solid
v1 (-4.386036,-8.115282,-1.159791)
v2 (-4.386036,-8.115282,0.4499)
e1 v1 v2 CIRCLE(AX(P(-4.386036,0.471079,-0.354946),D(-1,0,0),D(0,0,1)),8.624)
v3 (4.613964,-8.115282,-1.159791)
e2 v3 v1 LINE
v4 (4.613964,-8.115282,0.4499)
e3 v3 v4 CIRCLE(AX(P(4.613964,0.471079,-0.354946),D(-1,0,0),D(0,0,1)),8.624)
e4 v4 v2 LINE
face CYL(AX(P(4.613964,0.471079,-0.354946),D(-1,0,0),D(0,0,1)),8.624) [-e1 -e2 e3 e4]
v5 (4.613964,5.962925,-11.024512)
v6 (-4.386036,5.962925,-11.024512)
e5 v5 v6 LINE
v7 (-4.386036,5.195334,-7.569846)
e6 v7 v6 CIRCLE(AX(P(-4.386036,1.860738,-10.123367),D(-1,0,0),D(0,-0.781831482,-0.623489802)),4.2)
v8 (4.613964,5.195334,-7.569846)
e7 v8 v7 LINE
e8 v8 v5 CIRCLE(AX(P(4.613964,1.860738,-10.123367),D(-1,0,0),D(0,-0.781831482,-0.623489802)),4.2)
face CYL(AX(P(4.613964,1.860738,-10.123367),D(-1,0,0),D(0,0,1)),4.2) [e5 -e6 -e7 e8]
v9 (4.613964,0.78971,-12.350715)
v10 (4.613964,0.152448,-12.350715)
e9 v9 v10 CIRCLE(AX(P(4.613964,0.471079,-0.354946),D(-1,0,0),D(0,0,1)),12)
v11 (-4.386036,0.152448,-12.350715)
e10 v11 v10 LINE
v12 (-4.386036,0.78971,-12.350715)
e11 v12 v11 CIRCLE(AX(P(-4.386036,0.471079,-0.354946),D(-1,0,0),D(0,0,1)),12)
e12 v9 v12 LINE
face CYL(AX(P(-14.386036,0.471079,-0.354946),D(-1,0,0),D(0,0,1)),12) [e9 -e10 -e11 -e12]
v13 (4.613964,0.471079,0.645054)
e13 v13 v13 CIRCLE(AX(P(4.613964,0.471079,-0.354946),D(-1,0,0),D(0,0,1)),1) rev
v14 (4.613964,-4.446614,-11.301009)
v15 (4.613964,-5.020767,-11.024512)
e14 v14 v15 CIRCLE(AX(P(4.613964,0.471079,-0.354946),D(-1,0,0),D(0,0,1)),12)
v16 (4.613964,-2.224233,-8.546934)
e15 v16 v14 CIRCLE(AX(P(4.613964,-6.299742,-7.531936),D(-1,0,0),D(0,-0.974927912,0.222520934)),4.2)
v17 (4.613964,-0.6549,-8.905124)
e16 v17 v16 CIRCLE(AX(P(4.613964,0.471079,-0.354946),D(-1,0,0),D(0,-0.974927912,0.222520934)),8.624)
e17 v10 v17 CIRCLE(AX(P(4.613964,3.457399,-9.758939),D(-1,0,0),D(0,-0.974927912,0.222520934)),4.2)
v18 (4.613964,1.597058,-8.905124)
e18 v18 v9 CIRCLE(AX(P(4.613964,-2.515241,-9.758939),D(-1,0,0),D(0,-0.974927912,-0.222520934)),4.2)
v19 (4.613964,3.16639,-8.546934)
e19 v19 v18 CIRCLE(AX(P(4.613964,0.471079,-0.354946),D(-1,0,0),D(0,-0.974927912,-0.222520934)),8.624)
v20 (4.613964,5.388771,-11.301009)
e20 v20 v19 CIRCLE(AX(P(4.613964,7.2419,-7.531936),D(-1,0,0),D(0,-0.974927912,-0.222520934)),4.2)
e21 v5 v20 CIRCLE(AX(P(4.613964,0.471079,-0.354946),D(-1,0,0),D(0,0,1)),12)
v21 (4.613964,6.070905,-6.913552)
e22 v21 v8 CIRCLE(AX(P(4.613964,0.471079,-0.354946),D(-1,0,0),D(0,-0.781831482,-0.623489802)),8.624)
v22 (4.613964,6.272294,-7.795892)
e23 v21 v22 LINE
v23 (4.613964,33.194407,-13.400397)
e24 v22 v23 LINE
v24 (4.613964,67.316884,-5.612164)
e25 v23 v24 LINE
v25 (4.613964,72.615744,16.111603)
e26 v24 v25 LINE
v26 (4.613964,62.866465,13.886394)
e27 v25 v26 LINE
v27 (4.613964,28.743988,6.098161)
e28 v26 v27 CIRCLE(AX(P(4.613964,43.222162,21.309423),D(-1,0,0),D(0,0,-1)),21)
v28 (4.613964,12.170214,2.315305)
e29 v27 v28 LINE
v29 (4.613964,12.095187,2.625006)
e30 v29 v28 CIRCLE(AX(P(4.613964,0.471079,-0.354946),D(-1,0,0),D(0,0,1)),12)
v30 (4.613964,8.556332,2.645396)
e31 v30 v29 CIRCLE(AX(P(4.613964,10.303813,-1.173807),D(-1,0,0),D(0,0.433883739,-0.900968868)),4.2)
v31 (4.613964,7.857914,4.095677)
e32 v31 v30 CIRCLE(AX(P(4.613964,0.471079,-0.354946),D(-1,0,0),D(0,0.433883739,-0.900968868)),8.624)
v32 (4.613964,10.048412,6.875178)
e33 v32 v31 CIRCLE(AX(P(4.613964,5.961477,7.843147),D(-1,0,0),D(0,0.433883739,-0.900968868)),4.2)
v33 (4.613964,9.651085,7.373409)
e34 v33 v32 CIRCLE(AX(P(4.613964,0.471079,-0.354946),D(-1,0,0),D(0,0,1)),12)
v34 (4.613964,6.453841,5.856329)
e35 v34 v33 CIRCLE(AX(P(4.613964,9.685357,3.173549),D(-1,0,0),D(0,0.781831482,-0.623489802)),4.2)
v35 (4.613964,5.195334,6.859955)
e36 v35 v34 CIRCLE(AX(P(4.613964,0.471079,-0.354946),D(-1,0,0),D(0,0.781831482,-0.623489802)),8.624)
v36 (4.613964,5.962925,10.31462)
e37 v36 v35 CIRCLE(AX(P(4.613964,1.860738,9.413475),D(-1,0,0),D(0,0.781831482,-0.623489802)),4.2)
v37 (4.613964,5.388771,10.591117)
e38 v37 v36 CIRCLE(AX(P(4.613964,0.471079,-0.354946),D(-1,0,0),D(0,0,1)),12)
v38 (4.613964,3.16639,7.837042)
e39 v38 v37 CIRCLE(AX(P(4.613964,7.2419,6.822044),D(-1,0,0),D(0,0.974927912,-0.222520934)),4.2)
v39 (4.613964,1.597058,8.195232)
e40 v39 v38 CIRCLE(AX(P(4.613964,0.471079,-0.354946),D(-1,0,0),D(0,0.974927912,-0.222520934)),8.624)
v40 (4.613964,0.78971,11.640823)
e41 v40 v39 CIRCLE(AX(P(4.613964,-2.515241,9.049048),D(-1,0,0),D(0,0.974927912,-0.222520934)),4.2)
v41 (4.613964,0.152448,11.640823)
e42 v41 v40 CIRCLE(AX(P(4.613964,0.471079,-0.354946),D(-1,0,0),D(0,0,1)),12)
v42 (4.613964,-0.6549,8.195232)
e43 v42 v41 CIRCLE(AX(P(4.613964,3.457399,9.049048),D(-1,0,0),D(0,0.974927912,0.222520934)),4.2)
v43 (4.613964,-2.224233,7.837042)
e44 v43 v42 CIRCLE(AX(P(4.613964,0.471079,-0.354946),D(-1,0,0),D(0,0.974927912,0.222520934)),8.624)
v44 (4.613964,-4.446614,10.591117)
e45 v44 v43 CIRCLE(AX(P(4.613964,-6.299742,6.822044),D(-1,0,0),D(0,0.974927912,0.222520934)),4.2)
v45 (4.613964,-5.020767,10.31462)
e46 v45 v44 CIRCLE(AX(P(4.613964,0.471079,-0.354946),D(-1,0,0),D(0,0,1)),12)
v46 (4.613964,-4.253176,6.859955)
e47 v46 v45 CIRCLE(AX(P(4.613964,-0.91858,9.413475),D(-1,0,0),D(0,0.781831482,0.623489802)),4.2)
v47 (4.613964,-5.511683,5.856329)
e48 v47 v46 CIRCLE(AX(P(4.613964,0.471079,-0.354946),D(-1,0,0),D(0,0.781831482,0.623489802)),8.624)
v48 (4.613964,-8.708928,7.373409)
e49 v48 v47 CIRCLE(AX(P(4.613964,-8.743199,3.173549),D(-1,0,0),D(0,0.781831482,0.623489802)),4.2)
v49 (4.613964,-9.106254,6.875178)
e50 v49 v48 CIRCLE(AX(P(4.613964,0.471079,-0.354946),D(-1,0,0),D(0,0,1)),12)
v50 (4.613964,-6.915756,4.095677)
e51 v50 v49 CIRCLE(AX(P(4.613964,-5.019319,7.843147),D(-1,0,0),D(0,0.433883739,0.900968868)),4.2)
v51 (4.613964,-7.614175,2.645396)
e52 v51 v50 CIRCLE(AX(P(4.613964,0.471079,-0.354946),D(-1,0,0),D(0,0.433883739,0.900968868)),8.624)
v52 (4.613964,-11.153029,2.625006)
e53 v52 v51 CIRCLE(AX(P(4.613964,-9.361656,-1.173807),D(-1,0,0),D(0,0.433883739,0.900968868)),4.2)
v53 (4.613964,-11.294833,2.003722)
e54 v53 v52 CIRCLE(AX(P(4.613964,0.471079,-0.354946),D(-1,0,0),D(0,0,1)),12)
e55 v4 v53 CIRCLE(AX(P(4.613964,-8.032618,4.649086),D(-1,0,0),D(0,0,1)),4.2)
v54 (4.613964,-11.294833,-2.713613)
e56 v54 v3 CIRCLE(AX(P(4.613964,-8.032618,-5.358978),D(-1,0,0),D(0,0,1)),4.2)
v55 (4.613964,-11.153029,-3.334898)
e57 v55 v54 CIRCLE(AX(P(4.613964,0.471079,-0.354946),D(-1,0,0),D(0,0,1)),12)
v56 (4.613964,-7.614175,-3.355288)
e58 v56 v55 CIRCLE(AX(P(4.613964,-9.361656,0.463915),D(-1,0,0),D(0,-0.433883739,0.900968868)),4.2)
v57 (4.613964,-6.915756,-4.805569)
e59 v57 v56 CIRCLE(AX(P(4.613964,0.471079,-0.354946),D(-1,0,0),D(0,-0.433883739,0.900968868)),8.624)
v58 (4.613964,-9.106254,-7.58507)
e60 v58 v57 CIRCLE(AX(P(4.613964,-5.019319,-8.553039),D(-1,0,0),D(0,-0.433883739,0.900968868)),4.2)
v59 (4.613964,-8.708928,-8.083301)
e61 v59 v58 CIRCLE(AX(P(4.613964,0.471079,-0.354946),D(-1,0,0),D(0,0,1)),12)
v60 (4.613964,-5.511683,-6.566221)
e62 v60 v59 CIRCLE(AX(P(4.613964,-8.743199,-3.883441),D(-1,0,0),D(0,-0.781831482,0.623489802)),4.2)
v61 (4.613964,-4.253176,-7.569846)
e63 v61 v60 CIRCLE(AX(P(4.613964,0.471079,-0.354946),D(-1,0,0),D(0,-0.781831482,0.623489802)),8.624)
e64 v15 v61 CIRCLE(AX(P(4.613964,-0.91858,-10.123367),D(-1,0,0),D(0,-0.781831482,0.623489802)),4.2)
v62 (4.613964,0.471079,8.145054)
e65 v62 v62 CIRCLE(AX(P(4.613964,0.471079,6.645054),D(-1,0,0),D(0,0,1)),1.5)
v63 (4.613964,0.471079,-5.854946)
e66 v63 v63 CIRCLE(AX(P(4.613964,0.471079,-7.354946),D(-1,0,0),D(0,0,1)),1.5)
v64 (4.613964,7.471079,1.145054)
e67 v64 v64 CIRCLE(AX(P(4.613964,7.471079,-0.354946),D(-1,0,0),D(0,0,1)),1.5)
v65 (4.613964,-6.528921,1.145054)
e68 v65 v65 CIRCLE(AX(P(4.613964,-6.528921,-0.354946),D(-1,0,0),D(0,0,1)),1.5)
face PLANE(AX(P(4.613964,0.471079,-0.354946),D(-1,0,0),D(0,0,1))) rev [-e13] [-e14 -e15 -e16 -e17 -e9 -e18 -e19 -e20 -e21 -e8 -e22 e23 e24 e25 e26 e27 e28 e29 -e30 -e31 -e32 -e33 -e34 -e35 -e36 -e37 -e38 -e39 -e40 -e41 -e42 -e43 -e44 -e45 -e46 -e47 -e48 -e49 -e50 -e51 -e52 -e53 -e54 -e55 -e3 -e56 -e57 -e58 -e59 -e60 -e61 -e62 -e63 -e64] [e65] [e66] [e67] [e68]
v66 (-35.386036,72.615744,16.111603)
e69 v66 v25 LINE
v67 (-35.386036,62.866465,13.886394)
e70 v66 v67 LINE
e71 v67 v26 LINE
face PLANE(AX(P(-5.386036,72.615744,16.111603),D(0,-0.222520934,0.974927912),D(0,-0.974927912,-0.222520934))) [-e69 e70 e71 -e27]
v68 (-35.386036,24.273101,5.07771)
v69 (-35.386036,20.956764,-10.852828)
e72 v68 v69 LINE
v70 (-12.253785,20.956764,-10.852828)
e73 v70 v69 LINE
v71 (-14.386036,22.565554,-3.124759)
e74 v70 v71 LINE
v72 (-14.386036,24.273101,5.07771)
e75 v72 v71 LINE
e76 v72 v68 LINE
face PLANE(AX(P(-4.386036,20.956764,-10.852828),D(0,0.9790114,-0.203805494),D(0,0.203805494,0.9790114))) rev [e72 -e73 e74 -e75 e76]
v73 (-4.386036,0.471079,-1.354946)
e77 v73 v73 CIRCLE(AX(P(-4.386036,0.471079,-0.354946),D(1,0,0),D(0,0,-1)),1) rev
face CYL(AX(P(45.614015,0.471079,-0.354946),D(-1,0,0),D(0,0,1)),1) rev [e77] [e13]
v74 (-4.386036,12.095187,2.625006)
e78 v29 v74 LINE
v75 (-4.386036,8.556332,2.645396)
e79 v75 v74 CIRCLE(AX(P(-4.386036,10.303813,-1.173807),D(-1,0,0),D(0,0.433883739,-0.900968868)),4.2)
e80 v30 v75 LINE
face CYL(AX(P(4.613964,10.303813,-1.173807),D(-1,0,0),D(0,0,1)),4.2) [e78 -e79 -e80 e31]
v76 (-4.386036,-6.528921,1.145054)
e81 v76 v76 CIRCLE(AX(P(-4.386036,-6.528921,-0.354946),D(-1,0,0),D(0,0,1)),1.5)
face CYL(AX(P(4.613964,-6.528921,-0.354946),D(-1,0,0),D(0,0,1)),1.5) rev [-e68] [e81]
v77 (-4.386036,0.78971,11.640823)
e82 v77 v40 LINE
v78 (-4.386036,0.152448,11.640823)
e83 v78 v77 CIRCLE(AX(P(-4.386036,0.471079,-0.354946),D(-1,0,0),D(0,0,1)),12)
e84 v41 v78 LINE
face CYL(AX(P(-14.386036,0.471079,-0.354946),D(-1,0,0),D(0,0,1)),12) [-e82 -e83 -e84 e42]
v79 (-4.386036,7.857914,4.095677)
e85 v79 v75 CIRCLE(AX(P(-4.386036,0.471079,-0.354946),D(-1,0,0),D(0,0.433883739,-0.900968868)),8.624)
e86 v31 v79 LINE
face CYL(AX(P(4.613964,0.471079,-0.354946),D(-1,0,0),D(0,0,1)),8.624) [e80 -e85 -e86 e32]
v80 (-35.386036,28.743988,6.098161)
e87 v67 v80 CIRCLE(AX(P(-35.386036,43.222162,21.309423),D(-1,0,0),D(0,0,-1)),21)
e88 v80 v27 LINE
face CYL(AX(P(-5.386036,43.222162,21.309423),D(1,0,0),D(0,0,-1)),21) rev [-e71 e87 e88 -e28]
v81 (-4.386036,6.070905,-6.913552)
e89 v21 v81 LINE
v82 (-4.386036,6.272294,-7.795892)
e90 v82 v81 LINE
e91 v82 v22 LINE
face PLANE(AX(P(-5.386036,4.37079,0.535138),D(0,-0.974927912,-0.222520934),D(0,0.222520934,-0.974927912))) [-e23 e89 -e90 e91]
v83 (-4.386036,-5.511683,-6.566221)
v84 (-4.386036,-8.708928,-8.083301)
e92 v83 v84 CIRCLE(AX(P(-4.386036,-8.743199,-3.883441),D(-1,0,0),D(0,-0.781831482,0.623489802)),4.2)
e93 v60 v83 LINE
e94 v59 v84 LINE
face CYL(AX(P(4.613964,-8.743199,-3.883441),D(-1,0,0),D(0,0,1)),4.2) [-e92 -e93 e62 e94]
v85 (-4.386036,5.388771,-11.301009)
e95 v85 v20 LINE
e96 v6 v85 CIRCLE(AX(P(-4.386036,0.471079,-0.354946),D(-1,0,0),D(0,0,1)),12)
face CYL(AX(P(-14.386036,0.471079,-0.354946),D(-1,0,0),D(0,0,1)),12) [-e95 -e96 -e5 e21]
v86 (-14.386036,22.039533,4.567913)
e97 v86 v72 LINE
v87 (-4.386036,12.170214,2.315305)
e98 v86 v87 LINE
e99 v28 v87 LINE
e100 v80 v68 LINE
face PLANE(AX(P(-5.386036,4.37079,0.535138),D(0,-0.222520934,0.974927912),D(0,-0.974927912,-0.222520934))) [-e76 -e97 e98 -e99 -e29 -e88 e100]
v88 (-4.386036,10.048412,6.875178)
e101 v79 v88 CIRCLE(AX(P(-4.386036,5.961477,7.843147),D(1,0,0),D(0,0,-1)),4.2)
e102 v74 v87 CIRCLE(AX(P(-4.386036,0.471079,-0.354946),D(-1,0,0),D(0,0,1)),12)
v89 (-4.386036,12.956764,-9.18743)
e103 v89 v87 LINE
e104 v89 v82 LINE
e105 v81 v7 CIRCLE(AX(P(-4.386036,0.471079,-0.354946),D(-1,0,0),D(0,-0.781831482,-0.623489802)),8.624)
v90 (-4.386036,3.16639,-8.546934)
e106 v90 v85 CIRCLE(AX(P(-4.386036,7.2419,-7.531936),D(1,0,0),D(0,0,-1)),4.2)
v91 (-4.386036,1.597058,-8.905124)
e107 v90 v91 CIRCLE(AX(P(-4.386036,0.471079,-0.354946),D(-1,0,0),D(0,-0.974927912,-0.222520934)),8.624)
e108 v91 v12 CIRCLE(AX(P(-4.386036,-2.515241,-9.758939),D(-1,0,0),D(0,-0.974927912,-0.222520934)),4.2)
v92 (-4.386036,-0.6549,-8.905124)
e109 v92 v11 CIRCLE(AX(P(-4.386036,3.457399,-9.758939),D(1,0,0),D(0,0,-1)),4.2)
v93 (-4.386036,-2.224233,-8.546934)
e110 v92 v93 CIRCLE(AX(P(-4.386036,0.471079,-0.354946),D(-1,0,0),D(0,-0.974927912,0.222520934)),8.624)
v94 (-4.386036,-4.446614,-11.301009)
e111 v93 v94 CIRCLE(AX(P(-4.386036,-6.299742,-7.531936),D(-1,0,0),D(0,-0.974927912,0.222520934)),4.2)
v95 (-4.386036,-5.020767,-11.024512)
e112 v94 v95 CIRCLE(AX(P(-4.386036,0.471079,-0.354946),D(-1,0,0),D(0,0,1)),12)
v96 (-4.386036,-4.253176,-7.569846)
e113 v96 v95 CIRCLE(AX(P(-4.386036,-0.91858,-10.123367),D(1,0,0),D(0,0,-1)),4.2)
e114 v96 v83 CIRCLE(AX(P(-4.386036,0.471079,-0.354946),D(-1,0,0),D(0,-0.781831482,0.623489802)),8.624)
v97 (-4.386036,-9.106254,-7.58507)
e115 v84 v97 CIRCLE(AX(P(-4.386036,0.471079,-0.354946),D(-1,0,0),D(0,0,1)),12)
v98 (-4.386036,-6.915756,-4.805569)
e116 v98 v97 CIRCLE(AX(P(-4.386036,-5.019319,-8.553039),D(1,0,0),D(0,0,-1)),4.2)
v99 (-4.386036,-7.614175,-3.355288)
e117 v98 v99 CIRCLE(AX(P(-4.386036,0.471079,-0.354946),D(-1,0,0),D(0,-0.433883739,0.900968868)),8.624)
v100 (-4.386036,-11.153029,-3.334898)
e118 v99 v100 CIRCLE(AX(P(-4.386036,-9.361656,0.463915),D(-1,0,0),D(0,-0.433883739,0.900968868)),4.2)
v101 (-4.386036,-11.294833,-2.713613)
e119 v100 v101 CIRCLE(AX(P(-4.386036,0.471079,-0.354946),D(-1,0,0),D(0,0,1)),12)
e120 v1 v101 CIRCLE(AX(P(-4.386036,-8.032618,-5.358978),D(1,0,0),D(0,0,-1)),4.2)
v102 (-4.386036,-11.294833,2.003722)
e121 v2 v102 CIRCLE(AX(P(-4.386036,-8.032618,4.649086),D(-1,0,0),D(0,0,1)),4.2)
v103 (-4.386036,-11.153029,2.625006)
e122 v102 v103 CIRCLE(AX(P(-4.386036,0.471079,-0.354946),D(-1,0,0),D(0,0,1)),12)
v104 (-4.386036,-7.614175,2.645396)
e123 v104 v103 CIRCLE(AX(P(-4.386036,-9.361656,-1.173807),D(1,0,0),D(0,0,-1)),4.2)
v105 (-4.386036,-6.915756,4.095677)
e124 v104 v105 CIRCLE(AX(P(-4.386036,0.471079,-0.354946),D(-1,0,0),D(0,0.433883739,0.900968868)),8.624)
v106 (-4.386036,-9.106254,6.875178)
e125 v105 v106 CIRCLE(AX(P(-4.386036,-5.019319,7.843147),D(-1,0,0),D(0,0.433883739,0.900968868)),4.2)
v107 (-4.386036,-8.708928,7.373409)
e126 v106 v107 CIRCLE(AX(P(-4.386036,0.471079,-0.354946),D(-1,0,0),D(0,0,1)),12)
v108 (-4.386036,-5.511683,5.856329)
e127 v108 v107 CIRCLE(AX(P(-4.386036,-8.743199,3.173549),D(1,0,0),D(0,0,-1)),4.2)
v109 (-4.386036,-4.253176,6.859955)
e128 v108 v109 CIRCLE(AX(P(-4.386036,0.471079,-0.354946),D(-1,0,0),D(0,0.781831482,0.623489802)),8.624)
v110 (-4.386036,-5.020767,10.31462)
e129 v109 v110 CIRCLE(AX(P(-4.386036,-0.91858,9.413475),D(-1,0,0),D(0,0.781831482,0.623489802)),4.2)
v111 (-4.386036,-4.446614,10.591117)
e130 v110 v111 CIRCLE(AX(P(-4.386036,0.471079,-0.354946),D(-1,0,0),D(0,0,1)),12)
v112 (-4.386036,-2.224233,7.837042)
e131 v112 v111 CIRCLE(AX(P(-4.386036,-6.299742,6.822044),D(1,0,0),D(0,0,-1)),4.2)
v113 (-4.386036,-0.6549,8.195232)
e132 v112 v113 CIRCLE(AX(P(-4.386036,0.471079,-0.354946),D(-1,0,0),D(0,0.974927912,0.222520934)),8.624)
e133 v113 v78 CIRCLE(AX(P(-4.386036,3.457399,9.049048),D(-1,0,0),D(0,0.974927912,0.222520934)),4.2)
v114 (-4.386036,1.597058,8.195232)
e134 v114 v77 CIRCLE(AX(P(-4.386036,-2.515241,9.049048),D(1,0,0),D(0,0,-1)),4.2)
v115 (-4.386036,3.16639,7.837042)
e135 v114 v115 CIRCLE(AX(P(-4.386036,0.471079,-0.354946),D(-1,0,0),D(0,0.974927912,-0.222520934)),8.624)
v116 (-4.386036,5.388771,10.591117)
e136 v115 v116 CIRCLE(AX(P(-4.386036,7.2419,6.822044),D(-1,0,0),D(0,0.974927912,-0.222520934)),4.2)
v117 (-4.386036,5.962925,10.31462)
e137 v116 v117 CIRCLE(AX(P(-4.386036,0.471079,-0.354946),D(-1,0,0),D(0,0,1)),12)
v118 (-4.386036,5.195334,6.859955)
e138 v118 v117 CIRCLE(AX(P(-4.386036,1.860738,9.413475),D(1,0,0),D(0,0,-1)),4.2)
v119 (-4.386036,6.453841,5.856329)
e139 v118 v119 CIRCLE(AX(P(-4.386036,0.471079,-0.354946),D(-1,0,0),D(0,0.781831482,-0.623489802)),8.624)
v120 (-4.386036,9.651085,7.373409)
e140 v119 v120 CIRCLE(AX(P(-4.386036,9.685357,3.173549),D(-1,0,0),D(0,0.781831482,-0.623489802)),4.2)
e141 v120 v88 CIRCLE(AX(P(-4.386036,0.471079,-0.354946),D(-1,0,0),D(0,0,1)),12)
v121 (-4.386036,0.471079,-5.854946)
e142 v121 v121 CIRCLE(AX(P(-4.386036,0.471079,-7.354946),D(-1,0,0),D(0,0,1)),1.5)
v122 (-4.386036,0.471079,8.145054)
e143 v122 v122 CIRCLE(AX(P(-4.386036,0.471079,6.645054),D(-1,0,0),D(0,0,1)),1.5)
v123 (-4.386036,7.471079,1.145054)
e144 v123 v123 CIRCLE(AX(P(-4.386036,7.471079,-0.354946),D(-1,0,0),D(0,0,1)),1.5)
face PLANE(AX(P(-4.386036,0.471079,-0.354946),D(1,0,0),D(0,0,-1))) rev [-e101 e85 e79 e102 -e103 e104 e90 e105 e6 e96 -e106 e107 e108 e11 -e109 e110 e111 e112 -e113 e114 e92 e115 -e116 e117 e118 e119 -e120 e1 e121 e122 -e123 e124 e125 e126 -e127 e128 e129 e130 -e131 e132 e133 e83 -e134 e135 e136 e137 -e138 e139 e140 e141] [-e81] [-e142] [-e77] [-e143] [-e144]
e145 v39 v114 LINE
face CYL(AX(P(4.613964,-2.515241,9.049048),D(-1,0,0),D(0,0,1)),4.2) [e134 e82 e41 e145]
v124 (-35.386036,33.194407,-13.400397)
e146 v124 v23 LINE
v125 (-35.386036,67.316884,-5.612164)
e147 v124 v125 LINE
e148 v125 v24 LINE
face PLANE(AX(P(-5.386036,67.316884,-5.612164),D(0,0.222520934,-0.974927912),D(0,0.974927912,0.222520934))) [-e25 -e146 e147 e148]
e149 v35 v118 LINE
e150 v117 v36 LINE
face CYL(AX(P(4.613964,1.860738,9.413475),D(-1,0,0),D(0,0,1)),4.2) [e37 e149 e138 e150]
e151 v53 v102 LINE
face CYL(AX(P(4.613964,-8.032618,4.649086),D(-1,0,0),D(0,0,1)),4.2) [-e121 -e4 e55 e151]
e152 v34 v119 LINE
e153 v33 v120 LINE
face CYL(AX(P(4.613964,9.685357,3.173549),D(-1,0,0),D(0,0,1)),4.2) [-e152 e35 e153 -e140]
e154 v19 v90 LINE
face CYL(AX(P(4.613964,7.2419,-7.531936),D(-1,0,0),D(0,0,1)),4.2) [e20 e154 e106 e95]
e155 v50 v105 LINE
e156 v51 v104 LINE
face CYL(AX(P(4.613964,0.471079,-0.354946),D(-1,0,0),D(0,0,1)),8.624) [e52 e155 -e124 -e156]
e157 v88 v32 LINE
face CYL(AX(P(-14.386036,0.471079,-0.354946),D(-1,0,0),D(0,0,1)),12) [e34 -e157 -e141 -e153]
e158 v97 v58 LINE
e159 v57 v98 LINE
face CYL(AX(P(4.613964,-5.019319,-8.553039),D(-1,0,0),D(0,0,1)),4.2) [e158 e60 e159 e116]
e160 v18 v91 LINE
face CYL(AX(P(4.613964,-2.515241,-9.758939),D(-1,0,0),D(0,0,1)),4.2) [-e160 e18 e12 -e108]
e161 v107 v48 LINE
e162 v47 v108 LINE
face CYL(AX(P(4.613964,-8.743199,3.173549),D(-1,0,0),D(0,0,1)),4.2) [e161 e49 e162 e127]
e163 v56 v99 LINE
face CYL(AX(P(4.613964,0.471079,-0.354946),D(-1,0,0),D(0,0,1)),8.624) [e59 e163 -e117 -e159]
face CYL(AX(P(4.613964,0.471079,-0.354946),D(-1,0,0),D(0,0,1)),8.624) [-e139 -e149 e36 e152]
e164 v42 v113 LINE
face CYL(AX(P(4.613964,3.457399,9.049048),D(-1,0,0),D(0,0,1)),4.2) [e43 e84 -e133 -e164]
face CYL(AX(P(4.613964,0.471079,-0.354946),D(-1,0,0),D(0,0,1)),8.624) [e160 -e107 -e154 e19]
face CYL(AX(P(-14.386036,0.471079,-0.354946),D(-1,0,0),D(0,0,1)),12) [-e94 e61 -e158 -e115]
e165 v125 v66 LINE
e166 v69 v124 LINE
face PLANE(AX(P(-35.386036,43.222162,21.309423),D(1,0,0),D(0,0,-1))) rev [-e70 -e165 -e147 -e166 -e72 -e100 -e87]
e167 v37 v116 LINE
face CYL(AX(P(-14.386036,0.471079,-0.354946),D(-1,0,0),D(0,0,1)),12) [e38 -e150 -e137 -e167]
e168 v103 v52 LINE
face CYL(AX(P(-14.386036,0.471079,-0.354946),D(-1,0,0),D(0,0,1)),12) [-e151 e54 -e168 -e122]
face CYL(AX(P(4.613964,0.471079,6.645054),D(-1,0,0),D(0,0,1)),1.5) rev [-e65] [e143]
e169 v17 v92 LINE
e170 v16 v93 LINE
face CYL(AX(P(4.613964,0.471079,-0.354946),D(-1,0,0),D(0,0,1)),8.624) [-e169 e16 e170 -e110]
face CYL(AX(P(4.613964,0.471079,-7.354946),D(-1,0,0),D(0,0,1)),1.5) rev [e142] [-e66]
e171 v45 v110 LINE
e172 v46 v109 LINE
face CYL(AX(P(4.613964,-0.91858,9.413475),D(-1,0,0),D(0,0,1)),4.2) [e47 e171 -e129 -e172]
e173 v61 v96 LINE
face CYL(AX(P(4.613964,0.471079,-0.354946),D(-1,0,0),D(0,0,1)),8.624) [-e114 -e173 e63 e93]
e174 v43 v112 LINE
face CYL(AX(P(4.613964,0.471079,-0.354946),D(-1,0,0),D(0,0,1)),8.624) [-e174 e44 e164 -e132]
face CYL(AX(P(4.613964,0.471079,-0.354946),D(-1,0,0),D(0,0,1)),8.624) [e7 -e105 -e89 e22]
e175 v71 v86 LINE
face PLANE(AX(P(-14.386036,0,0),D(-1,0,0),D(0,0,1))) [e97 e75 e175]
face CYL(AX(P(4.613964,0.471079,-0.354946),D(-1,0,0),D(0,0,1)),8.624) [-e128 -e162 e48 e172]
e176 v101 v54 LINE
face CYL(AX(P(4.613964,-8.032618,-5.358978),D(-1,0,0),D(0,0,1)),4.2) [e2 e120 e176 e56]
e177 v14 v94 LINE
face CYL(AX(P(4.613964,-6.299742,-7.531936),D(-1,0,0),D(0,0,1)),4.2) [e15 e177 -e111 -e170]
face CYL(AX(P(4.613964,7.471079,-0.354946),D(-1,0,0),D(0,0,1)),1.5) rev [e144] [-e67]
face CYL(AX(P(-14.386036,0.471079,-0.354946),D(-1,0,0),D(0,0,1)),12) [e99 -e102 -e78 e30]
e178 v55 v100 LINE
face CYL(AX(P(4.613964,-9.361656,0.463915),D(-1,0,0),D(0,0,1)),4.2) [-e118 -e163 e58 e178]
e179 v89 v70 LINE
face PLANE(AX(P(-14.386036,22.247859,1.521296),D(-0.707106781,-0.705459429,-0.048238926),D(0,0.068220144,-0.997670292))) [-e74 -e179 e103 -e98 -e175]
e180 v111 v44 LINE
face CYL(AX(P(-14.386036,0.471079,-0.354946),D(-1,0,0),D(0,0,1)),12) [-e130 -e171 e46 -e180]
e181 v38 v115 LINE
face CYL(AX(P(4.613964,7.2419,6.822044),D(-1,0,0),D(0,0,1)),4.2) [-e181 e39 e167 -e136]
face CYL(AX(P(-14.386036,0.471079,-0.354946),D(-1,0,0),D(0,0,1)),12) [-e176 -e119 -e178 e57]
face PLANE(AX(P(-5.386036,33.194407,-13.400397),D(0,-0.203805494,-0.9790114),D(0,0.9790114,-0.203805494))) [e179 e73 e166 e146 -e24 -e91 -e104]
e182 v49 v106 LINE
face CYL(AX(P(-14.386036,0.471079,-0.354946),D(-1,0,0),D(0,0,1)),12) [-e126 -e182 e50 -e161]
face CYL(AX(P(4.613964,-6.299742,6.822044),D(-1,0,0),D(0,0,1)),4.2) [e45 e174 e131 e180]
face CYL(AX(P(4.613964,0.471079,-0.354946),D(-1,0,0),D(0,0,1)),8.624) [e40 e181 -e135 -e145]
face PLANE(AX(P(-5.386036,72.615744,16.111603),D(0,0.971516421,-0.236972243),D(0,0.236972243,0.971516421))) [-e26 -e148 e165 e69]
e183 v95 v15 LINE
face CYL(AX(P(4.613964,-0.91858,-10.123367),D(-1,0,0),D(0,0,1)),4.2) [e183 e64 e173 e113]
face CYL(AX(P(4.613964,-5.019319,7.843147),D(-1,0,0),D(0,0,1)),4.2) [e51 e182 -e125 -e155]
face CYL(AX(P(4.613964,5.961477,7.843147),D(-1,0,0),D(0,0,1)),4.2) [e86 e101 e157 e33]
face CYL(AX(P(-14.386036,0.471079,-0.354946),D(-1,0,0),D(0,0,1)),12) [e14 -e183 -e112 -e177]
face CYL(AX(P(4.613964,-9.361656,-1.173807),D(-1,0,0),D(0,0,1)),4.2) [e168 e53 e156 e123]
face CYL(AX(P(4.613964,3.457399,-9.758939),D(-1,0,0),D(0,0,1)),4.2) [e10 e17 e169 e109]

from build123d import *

# Parameters (mm, degrees)
BOSS_EXTRUDE1_START     = -9
BOSS_EXTRUDE1_OUTLINE_R = 1
BOSS_EXTRUDE1_DEPTH     = 9
BOSS_EXTRUDE1_START_2   = -10
BOSS_EXTRUDE1_2_DEPTH   = 1
BOSS_EXTRUDE2_START     = -40
BOSS_EXTRUDE2_DEPTH     = 40
CUT_EXTRUDE6_DEPTH      = 31
BOSS_EXTRUDE5_DEPTH     = 10
CHAMFER5_SIZE           = 10
SKETCH17_R              = 1.5000000000000002
SKETCH17_R_2            = 1.5000000000000004
SKETCH17_R_3            = 1.5
CUT_EXTRUDE7_DEPTH      = 81.58306320285853


with BuildPart() as part:
    # Boss-Extrude1: read off the stored shape, not the designer's step
    # Boss-Extrude1 outline → Boss-Extrude1 (new body)
    with BuildSketch(Plane(origin=(4.6139639648499715, 0, 0), x_dir=(0, 0, -1), z_dir=(1, 0, 0)).offset(BOSS_EXTRUDE1_START)):
        with BuildLine():
            ThreePointArc((-10.591117285, -4.446613705), (-10.456680456, -4.73552608), (-10.314619658, -5.020766944))
            ThreePointArc((-10.314619658, -5.020766944), (-8.502494616, -5.018593908), (-6.859954563, -4.253176333))
            ThreePointArc((-6.859954563, -4.253176333), (-6.387568746, -4.905897262), (-5.856328627, -5.51168345))
            ThreePointArc((-5.856328627, -5.51168345), (-6.968055133, -6.942720161), (-7.373409443, -8.708927899))
            ThreePointArc((-7.373409443, -8.708927899), (-7.126931664, -8.910899), (-6.875177934, -9.106254268))
            ThreePointArc((-6.875177934, -9.106254268), (-5.243452532, -8.318044841), (-4.095677319, -6.915756016))
            ThreePointArc((-4.095677319, -6.915756016), (-3.386867407, -7.298876727), (-2.645395822, -7.614174775))
            ThreePointArc((-2.645395822, -7.614174775), (-3.026123234, -9.385854353), (-2.625006031, -11.153029182))
            ThreePointArc((-2.625006031, -11.153029182), (-2.315305249, -11.228056157), (-2.003721502, -11.294833322))
            ThreePointArc((-2.003721502, -11.294833322), (-0.875578967, -9.876702048), (-0.449899552, -8.115282471))
            ThreePointArc((-0.449899552, -8.115282471), (0.354945958, -8.15292121), (1.159791469, -8.115282471))
            ThreePointArc((1.159791469, -8.115282471), (1.585470883, -9.876702048), (2.713613419, -11.294833322))
            ThreePointArc((2.713613419, -11.294833322), (3.025197166, -11.228056157), (3.334897948, -11.153029182))
            ThreePointArc((3.334897948, -11.153029182), (3.736015151, -9.385854353), (3.355287739, -7.614174775))
            ThreePointArc((3.355287739, -7.614174775), (4.096759324, -7.298876727), (4.805569236, -6.915756016))
            ThreePointArc((4.805569236, -6.915756016), (5.953344449, -8.318044841), (7.585069851, -9.106254268))
            ThreePointArc((7.585069851, -9.106254268), (7.836823581, -8.910899), (8.083301359, -8.708927899))
            ThreePointArc((8.083301359, -8.708927899), (7.677947049, -6.942720161), (6.566220544, -5.51168345))
            ThreePointArc((6.566220544, -5.51168345), (7.097460663, -4.905897262), (7.56984648, -4.253176333))
            ThreePointArc((7.56984648, -4.253176333), (9.212386533, -5.018593908), (11.024511575, -5.020766944))
            ThreePointArc((11.024511575, -5.020766944), (11.166572373, -4.73552608), (11.301009202, -4.446613705))
            ThreePointArc((11.301009202, -4.446613705), (10.169468771, -3.031192163), (8.546934241, -2.224232691))
            ThreePointArc((8.546934241, -2.224232691), (8.762724273, -1.447941745), (8.90512419, -0.654899984))
            ThreePointArc((8.90512419, -0.654899984), (10.717103882, -0.631845971), (12.350714974, 0.152447781))
            ThreePointArc((12.350714974, 0.152447781), (12.354945958, 0.47107879), (12.350714974, 0.789709799))
            ThreePointArc((12.350714974, 0.789709799), (10.717103881, 1.57400355), (8.90512419, 1.597057563))
            ThreePointArc((8.90512419, 1.597057563), (8.762724273, 2.390099324), (8.546934241, 3.16639027))
            ThreePointArc((8.546934241, 3.16639027), (10.169468771, 3.973349742), (11.301009202, 5.388771284))
            ThreePointArc((11.301009202, 5.388771284), (11.166572373, 5.677683659), (11.024511575, 5.962924523))
            ThreePointArc((11.024511575, 5.962924523), (9.212386533, 5.960751487), (7.56984648, 5.195333912))
            ThreePointArc((7.56984648, 5.195333912), (7.255600261, 5.643539152), (6.913552392, 6.070905362))
            Line((6.913552392, 6.070905362), (7.795891782, 6.27229357))
            Line((7.795891782, 6.27229357), (13.400397117, 33.194406922))
            Line((13.400397117, 33.194406922), (5.612164429, 67.316883848))
            Line((5.612164429, 67.316883848), (-16.111603154, 72.615744291))
            Line((-16.111603154, 72.615744291), (-13.886393815, 62.866465169))
            ThreePointArc((-13.886393815, 62.866465169), (-0.835936603, 47.895101758), (-6.098161126, 28.743988243))
            Line((-6.098161126, 28.743988243), (-2.315305249, 12.170213736))
            ThreePointArc((-2.315305249, 12.170213736), (-2.470404693, 12.133728304), (-2.625006031, 12.095186762))
            ThreePointArc((-2.625006031, 12.095186762), (-3.026123234, 10.328011932), (-2.645395822, 8.556332354))
            ThreePointArc((-2.645395822, 8.556332354), (-3.386867407, 8.241034306), (-4.095677319, 7.857913595))
            ThreePointArc((-4.095677319, 7.857913595), (-5.243452532, 9.260202421), (-6.875177934, 10.048411847))
            ThreePointArc((-6.875177934, 10.048411847), (-7.126931664, 9.853056579), (-7.373409443, 9.651085478))
            ThreePointArc((-7.373409443, 9.651085478), (-6.968055133, 7.88487774), (-5.856328627, 6.45384103))
            ThreePointArc((-5.856328627, 6.45384103), (-6.387568746, 5.848054841), (-6.859954563, 5.195333912))
            ThreePointArc((-6.859954563, 5.195333912), (-8.502494616, 5.960751487), (-10.314619658, 5.962924523))
            ThreePointArc((-10.314619658, 5.962924523), (-10.456680456, 5.677683659), (-10.591117285, 5.388771284))
            ThreePointArc((-10.591117285, 5.388771284), (-9.459576854, 3.973349742), (-7.837042324, 3.16639027))
            ThreePointArc((-7.837042324, 3.16639027), (-8.052832356, 2.390099324), (-8.195232274, 1.597057563))
            ThreePointArc((-8.195232274, 1.597057563), (-10.007211965, 1.57400355), (-11.640823057, 0.789709799))
            ThreePointArc((-11.640823057, 0.789709799), (-11.645054042, 0.47107879), (-11.640823057, 0.152447781))
            ThreePointArc((-11.640823057, 0.152447781), (-10.007211965, -0.631845971), (-8.195232274, -0.654899984))
            ThreePointArc((-8.195232274, -0.654899984), (-8.052832356, -1.447941745), (-7.837042324, -2.224232691))
            ThreePointArc((-7.837042324, -2.224232691), (-9.459576854, -3.031192163), (-10.591117285, -4.446613705))
        make_face()
        with Locations((0.354945958, 0.47107879)):
            Circle(BOSS_EXTRUDE1_OUTLINE_R, mode=Mode.SUBTRACT)
    extrude(amount=BOSS_EXTRUDE1_DEPTH)

    # Boss-Extrude1 2 outline → Boss-Extrude1 2 (add)
    with BuildSketch(Plane(origin=(4.6139639648499715, 0, 0), x_dir=(0, 0, -1), z_dir=(1, 0, 0)).offset(BOSS_EXTRUDE1_START_2)):
        with BuildLine():
            Line((-6.098161126, 28.743988243), (-0.535137777, 4.370790438))
            Line((-0.535137777, 4.370790438), (7.795891782, 6.27229357))
            Line((7.795891782, 6.27229357), (13.400397117, 33.194406922))
            Line((13.400397117, 33.194406922), (5.612164429, 67.316883848))
            Line((5.612164429, 67.316883848), (-16.111603154, 72.615744291))
            Line((-16.111603154, 72.615744291), (-13.886393815, 62.866465169))
            ThreePointArc((-13.886393815, 62.866465169), (-0.835936603, 47.895101758), (-6.098161126, 28.743988243))
        make_face()
    extrude(amount=BOSS_EXTRUDE1_2_DEPTH)

    # Sketch2 → Boss-Extrude2 (add)
    with BuildSketch(Plane(origin=(4.6139639648499715, 0, 0), x_dir=(0, 0, -1), z_dir=(1, 0, 0)).offset(BOSS_EXTRUDE2_START)):
        with BuildLine():
            Line((-16.11160315441779, 72.61574429110016), (5.612164428781802, 67.31688384840837))
            Line((5.612164428781802, 67.31688384840837), (13.400397117252913, 33.19440692204444))
            Line((13.400397117252913, 33.19440692204444), (8.3052597658331, 8.719121931463299))
            Line((8.3052597658331, 8.719121931463299), (-1.647742447257206, 9.245429999281619))
            Line((-1.647742447257206, 9.245429999281619), (-6.098161126383539, 28.743988242918082))
            ThreePointArc((-6.098161126383539, 28.743988242918082), (-0.8359366030316124, 47.895101758418704), (-13.886393814854628, 62.866465169281916))
            Line((-13.886393814854628, 62.866465169281916), (-16.11160315441779, 72.61574429110016))
        make_face()
    extrude(amount=BOSS_EXTRUDE2_DEPTH)

    # Sketch13 → Cut-Extrude6 (cut)
    with BuildSketch(Plane.ZY.offset(35.386036035150035)):
        Polygon((-7.7958917817334035, 6.272293570213381), (-10.852828441543005, 20.95676442675387), (5.0777102899861175, 24.273101006715667), (0.5351377774756237, 4.370790438372502), align=None)
    extrude(amount=-CUT_EXTRUDE6_DEPTH, mode=Mode.SUBTRACT)

    # Sketch15 → Boss-Extrude5 (add)
    with BuildSketch(Plane.ZY.offset(4.3860360351500285)):
        Polygon((-10.852828441543005, 20.95676442675387), (5.077710289986116, 24.273101006715674), (2.315305249124831, 12.17021373582128), (-9.187430109019209, 12.956764426753871), align=None)
    extrude(amount=BOSS_EXTRUDE5_DEPTH)

    # Chamfer5
    chamfer5_edges = [part.edges().sort_by_distance(p)[0] for p in [
        (-14.386036035150028, 12.563489081287575, -3.436062429947189),
    ]]
    chamfer(chamfer5_edges, length=CHAMFER5_SIZE - 0.0001)  # a hair under: the kernel refuses the full size

    # Sketch17 → Cut-Extrude7 (cut, through all)
    with BuildSketch(Plane.ZY.offset(4.3860360351500285)):
        with Locations((-0.35494595834961384, 7.471078789645248)):
            Circle(SKETCH17_R)
        with Locations((6.645054041650483, 0.47107878964532196)):
            Circle(SKETCH17_R)
        with Locations((-0.354945958349467, -6.528921210354753)):
            Circle(SKETCH17_R_2)
        with Locations((-7.354945958349516, 0.4710787896452233)):
            Circle(SKETCH17_R_3)
    extrude(amount=-CUT_EXTRUDE7_DEPTH, mode=Mode.SUBTRACT)


solid = part.part
